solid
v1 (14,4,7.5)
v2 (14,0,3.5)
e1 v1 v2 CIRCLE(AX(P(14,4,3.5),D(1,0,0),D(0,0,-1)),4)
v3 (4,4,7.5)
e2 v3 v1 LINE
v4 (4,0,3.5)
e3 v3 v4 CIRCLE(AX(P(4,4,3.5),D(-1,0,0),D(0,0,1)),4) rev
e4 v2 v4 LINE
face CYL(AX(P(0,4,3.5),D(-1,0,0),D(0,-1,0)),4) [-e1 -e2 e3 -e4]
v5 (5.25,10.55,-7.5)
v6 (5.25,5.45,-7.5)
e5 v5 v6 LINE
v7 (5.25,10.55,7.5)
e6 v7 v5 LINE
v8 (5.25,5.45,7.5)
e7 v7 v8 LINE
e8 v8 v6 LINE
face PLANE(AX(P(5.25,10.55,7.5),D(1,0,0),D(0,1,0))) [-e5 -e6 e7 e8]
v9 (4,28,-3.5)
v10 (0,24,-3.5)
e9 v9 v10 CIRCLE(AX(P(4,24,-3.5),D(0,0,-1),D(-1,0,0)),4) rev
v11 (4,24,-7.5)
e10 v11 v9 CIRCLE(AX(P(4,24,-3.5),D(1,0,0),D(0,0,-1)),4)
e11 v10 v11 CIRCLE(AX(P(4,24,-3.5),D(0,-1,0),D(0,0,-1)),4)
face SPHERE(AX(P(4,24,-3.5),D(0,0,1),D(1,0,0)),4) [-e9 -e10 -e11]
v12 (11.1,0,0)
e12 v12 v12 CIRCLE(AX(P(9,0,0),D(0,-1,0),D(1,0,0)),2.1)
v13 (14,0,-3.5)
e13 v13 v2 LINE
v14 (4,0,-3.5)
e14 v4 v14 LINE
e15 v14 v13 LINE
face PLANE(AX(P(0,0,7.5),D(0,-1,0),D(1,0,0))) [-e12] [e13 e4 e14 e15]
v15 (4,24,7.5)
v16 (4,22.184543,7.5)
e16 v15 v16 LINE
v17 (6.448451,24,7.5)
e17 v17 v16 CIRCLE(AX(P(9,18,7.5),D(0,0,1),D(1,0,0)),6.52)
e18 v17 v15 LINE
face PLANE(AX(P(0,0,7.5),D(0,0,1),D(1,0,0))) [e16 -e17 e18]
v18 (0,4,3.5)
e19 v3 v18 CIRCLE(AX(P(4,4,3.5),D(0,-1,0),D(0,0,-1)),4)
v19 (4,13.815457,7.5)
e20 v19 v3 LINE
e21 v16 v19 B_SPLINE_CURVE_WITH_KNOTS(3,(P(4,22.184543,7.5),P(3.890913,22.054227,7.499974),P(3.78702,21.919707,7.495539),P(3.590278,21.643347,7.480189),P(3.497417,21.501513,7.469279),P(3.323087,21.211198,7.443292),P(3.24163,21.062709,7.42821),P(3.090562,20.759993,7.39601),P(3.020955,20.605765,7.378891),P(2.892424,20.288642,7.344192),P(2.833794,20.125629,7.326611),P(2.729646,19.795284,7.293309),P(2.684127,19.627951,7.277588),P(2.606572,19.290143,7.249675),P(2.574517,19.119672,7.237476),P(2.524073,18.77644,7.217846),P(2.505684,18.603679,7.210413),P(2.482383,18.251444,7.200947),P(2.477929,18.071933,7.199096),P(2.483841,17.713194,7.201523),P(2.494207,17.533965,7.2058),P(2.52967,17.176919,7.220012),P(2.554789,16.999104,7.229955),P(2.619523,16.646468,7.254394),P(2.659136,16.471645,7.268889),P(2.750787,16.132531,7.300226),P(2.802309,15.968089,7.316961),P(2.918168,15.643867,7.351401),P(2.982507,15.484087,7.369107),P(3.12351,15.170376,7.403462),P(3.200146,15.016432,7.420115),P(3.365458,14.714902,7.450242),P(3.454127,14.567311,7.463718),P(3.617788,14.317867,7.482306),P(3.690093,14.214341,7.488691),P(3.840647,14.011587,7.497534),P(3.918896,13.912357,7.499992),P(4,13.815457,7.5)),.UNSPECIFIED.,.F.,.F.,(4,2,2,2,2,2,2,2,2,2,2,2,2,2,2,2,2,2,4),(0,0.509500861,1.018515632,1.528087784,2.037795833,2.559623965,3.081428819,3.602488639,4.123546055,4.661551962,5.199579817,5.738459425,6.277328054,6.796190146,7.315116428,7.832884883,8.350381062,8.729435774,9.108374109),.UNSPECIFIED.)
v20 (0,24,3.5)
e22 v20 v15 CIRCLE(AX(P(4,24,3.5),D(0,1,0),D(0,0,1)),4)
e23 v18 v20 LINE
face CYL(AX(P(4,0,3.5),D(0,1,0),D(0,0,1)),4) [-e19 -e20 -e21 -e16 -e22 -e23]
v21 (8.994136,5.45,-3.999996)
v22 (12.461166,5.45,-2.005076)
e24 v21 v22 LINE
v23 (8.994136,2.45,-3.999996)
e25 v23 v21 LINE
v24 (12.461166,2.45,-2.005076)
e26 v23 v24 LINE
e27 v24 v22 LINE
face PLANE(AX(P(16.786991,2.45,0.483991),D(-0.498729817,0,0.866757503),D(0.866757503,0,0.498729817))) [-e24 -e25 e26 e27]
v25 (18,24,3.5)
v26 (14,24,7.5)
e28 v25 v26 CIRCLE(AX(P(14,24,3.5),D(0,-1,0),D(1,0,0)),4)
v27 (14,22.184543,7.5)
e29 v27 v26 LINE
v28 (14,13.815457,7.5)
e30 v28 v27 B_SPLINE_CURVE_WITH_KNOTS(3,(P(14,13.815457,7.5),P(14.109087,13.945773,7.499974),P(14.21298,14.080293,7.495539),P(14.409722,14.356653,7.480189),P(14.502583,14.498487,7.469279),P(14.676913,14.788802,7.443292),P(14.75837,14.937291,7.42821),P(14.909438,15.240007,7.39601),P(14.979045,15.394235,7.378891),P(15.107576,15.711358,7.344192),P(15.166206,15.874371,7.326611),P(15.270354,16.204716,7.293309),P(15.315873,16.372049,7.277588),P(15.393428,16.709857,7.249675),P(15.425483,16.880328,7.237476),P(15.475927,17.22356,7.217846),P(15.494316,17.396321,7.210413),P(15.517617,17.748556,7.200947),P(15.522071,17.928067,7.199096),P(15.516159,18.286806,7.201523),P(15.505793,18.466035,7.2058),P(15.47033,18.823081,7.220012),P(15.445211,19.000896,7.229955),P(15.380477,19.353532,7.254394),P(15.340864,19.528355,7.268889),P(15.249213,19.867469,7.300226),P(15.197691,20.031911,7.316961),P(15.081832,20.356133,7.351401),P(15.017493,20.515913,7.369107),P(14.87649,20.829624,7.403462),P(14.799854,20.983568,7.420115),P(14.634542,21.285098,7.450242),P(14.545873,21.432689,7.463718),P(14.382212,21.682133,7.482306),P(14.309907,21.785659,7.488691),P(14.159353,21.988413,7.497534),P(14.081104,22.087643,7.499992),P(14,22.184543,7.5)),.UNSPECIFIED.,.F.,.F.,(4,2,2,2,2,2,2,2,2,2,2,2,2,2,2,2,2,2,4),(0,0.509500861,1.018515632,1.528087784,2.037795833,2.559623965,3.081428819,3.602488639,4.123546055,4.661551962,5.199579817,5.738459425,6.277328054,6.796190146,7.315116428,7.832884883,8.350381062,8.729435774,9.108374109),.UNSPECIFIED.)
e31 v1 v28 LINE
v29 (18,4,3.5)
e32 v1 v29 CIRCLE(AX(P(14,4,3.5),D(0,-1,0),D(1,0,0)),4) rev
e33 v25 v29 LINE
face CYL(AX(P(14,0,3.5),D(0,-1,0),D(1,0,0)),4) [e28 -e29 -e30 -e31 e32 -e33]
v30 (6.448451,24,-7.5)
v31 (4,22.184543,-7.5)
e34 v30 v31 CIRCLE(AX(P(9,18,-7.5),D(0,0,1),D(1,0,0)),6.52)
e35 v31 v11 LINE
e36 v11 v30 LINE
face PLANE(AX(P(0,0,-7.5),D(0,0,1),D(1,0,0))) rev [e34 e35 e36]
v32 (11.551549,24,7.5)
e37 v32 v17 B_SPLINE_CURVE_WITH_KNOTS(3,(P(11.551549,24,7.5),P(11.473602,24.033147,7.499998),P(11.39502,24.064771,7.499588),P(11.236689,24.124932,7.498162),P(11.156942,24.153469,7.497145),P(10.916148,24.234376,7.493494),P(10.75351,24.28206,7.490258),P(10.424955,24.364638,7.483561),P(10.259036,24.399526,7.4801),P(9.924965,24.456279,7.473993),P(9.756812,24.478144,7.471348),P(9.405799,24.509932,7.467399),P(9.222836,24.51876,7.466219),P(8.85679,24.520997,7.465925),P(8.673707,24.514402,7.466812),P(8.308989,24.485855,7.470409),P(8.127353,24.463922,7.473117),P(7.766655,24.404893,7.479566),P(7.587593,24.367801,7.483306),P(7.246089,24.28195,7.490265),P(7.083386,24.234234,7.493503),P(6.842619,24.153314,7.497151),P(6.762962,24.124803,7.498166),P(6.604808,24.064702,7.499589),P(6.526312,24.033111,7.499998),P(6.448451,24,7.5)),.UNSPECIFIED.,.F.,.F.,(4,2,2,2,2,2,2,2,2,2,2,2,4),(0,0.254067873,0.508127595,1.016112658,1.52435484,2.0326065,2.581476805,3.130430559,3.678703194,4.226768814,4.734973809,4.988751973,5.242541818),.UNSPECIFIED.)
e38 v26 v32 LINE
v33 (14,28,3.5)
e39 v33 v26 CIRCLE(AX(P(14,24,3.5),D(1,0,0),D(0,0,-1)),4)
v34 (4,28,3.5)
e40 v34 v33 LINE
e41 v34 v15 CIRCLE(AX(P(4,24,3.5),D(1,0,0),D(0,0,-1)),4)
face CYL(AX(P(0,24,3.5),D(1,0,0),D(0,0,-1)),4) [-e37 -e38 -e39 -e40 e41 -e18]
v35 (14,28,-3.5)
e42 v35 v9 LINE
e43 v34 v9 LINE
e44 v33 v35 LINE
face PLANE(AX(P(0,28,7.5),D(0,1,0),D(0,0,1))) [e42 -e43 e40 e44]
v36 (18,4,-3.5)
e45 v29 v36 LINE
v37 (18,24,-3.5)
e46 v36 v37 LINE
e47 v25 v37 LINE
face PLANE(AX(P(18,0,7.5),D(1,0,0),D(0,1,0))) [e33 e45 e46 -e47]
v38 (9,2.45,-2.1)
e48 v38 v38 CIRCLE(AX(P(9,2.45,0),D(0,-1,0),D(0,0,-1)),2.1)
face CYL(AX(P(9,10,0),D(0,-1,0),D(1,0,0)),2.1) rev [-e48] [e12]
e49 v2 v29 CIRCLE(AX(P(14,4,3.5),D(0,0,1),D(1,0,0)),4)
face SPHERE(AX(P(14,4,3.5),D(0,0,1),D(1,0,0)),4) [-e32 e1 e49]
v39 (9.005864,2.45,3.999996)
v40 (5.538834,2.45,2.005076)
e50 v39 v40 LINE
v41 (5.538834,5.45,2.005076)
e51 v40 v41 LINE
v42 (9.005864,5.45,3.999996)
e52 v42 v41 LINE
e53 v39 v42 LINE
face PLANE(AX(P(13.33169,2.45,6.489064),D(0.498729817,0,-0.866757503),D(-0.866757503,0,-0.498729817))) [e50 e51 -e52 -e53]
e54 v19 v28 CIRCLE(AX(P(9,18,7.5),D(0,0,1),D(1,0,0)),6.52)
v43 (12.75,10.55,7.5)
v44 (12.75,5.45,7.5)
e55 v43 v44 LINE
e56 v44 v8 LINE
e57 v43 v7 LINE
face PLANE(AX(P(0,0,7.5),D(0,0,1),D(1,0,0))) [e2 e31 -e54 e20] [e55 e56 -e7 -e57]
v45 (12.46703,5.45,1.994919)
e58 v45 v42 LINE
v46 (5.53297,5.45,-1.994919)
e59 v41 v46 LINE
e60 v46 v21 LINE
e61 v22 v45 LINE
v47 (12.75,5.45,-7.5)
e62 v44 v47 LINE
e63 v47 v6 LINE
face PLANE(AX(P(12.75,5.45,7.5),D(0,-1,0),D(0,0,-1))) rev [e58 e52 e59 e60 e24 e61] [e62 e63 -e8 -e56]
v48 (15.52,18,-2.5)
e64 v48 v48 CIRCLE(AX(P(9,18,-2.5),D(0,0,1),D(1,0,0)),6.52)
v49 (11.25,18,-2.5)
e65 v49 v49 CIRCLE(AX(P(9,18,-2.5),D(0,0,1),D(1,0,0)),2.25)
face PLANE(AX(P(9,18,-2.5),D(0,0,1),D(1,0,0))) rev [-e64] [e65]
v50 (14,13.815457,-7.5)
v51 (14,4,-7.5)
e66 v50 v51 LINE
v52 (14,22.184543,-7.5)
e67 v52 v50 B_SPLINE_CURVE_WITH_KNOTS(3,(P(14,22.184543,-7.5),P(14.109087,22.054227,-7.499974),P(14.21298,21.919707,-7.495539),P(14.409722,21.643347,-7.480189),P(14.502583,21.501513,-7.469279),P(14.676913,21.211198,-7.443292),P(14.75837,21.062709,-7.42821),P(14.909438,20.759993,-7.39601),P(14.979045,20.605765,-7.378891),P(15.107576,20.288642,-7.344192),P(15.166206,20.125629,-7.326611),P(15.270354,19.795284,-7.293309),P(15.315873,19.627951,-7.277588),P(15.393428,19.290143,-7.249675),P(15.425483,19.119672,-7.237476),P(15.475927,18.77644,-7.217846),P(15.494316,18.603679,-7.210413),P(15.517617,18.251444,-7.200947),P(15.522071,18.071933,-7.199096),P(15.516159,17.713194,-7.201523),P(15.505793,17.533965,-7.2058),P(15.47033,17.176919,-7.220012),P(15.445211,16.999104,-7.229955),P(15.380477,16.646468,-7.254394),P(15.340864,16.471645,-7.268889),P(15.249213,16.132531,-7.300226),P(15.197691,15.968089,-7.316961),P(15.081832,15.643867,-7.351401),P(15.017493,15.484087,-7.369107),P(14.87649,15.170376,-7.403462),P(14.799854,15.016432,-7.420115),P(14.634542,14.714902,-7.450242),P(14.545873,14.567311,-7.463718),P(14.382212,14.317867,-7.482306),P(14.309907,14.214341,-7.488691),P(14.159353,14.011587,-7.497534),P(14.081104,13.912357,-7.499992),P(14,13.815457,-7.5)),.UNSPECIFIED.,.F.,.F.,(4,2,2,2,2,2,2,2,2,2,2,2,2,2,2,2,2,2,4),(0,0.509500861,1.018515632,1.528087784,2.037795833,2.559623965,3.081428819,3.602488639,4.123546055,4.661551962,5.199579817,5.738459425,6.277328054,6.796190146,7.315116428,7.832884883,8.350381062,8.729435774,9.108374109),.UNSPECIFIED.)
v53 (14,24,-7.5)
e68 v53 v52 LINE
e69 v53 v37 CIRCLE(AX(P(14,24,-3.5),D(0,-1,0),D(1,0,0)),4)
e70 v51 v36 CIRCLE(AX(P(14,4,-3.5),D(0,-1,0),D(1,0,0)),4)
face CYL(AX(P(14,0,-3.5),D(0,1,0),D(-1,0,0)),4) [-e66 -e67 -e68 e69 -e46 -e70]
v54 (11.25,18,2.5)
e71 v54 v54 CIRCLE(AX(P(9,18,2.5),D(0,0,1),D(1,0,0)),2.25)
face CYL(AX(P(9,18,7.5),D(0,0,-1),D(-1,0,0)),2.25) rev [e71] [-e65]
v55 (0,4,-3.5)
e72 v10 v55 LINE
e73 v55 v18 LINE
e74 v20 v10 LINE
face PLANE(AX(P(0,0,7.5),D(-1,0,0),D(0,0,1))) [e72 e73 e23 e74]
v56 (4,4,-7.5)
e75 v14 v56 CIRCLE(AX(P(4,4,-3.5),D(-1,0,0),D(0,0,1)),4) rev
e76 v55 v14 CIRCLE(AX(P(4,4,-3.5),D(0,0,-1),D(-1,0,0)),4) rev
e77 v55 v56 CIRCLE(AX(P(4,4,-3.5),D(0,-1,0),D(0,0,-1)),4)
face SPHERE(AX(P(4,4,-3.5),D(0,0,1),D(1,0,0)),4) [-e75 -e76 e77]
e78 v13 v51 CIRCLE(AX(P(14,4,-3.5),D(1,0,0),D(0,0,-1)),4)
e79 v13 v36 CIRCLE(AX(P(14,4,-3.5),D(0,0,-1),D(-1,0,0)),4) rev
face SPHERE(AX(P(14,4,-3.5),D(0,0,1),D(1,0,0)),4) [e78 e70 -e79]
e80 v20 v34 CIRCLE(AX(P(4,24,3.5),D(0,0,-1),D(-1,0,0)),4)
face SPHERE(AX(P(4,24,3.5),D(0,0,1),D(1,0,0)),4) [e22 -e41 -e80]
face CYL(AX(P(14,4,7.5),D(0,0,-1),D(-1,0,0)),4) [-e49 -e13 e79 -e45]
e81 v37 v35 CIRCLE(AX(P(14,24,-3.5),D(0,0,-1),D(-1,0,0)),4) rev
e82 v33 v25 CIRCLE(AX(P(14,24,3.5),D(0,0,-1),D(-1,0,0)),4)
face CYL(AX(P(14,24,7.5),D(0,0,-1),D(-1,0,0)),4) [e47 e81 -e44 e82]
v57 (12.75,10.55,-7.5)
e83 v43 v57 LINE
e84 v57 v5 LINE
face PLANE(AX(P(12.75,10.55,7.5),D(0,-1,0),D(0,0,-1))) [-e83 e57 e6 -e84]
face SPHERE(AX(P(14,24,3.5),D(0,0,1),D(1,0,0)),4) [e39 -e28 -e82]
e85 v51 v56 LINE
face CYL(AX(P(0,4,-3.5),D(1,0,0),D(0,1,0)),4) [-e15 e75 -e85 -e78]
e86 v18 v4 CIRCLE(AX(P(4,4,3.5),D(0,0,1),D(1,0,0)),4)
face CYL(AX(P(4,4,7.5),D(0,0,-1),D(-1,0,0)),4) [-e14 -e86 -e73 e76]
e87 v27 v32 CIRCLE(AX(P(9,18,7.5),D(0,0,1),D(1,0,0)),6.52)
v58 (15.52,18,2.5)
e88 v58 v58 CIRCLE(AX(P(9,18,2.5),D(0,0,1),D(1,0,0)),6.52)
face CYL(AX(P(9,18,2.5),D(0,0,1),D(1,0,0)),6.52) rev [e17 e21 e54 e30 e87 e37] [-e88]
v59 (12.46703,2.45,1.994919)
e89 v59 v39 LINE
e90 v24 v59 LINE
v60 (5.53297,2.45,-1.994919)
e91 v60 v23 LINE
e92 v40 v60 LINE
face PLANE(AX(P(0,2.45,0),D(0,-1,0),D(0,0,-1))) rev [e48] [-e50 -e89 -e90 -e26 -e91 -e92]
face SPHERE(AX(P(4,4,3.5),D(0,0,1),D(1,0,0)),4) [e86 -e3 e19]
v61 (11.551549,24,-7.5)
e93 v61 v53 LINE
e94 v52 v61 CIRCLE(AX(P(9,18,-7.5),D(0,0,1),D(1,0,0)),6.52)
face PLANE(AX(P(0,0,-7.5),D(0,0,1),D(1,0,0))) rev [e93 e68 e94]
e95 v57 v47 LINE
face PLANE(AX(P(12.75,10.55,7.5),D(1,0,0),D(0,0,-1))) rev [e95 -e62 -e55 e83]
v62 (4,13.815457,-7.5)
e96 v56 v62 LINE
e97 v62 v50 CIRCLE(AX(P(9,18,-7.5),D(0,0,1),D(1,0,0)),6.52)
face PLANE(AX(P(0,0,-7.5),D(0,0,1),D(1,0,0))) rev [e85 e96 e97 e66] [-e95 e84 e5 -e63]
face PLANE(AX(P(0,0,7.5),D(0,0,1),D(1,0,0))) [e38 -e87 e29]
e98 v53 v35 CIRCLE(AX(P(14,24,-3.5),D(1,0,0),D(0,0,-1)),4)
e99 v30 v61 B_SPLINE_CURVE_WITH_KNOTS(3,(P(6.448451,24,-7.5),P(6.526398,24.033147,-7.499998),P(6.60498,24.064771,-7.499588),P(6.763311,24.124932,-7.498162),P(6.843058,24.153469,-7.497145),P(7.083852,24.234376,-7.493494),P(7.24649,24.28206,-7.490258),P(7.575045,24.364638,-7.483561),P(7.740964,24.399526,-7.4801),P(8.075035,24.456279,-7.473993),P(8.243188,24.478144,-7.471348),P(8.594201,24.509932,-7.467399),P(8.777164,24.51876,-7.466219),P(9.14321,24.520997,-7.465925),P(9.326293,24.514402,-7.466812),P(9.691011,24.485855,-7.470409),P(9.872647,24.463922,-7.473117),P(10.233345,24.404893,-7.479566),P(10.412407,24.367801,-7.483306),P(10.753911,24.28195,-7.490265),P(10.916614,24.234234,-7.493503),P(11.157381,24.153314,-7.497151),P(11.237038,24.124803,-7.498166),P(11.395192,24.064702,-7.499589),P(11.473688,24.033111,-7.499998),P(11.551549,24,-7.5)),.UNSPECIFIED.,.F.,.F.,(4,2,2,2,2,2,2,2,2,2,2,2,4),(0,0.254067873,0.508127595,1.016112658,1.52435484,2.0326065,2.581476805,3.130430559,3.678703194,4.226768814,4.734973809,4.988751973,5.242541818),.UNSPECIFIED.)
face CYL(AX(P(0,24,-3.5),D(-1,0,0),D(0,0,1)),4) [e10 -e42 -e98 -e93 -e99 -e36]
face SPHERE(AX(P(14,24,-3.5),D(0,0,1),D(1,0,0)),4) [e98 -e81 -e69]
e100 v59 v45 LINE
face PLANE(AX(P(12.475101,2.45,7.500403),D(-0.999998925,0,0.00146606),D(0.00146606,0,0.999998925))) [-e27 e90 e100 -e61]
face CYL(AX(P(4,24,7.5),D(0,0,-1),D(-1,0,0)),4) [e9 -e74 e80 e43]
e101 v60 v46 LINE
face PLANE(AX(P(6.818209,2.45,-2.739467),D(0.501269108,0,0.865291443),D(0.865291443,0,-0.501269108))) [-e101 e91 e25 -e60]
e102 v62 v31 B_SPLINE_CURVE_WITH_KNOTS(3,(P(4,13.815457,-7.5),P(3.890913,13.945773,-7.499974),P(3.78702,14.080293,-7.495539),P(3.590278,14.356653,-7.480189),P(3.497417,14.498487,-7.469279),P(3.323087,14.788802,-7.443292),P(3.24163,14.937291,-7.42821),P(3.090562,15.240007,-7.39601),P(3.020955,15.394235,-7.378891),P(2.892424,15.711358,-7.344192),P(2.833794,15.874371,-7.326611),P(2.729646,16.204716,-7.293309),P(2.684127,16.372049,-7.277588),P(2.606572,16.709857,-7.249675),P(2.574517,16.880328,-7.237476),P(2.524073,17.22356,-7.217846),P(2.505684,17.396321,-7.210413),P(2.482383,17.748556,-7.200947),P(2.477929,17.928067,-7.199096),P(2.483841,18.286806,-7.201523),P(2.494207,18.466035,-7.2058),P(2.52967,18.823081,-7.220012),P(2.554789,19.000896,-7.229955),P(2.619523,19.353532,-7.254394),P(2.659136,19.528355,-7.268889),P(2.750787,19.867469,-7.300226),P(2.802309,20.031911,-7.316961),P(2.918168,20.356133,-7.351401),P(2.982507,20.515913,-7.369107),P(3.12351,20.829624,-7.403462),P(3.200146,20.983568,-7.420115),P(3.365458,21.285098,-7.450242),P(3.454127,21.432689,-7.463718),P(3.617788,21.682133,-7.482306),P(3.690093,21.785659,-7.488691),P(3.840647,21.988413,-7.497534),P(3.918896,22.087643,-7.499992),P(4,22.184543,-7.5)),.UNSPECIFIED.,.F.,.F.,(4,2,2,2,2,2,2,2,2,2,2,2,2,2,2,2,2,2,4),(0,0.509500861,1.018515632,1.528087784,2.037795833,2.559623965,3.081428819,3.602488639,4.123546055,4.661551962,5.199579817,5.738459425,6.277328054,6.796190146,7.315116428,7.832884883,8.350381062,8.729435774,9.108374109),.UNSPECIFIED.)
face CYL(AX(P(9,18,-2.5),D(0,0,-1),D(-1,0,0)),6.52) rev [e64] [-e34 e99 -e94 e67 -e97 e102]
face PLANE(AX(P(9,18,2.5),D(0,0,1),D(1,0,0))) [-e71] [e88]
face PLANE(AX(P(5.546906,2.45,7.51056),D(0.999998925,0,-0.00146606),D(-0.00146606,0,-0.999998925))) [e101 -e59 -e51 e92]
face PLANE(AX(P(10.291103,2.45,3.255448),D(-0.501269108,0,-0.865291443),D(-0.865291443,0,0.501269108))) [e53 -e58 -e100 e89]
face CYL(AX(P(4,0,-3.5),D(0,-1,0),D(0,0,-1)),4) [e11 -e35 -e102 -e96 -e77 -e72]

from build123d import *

# Parameters (mm, degrees)
SKETCH1_R           = 2.25
BOSS_EXTRUDE1_DEPTH = 7.5
CUT_EXTRUDE1_START  = -7.5
SKETCH1_3_R         = 6.52
SKETCH1_3_R_2       = 2.25
CUT_EXTRUDE1_DEPTH  = 5
CUT_EXTRUDE2_START  = 2.5
SKETCH1_4_R         = 6.52
SKETCH1_4_R_2       = 2.25
CUT_EXTRUDE2_DEPTH  = 5
FILLET1_R           = 4
SKETCH2_R           = 2.1
CUT_EXTRUDE3_DEPTH  = 10
SKETCH3_W           = 7.5
SKETCH3_H           = 5.1
CUT_EXTRUDE4_DEPTH  = 37.510272694
CUT_EXTRUDE5_START  = -2.45
SKETCH2_7_R         = 2.1
CUT_EXTRUDE5_DEPTH  = 3


with BuildPart() as part:
    # Sketch1 → Boss-Extrude1 (new, symmetric)
    with BuildSketch(Plane.XY):
        with BuildLine():
            Line((0, 0), (0, 24))
            ThreePointArc((0, 24), (1.171572875, 26.828427125), (4, 28))
            Line((4, 28), (14, 28))
            ThreePointArc((14, 28), (16.828427125, 26.828427125), (18, 24))
            Line((18, 24), (18, 0))
            Line((18, 0), (0, 0))
        make_face()
        with Locations((9, 18)):
            Circle(SKETCH1_R, mode=Mode.SUBTRACT)
    extrude(amount=BOSS_EXTRUDE1_DEPTH, both=True)

    # Sketch1<3> → Cut-Extrude1 (cut)
    with BuildSketch(Plane.XY.offset(CUT_EXTRUDE1_START)):
        with Locations((9, 18)):
            Circle(SKETCH1_3_R)
        with Locations((9, 18)):
            Circle(SKETCH1_3_R_2, mode=Mode.SUBTRACT)
    extrude(amount=CUT_EXTRUDE1_DEPTH, mode=Mode.SUBTRACT)

    # Sketch1<4> → Cut-Extrude2 (cut)
    with BuildSketch(Plane.XY.offset(CUT_EXTRUDE2_START)):
        with Locations((9, 18)):
            Circle(SKETCH1_4_R)
        with Locations((9, 18)):
            Circle(SKETCH1_4_R_2, mode=Mode.SUBTRACT)
    extrude(amount=CUT_EXTRUDE2_DEPTH, mode=Mode.SUBTRACT)

    # Fillet1
    # the kernel refuses this fillet: 4 mm, written as the material it takes off along each edge
    with BuildSketch(Plane(origin=(4, 4, -3.5), x_dir=(0, -1, 0), z_dir=(-1, 0, 0))) as fillet1_piece_1_section:
        Polygon((0, 0), (FILLET1_R, 0), (FILLET1_R, -FILLET1_R), (0, -FILLET1_R), align=None)
    fillet1_piece_1 = extrude(amount=FILLET1_R, mode=Mode.PRIVATE)
    fillet1_piece_1 = fillet1_piece_1 - Plane(origin=(4, 4, -3.5), x_dir=(0, 0.7071067811865475, 0.7071067811865475), z_dir=(-1, 0, 0)) * Sphere(FILLET1_R, mode=Mode.PRIVATE)
    add(fillet1_piece_1, mode=Mode.SUBTRACT)
    with BuildSketch(Plane(origin=(4, 4, 3.5), x_dir=(0, -1, 0), z_dir=(-1, 0, 0))) as fillet1_piece_2_section:
        Polygon((0, 0), (FILLET1_R, 0), (FILLET1_R, FILLET1_R), (0, FILLET1_R), align=None)
    fillet1_piece_2 = extrude(amount=FILLET1_R, mode=Mode.PRIVATE)
    fillet1_piece_2 = fillet1_piece_2 - Plane(origin=(4, 4, 3.5), x_dir=(0, 0.7071067811865475, -0.7071067811865475), z_dir=(-1, 0, 0)) * Sphere(FILLET1_R, mode=Mode.PRIVATE)
    add(fillet1_piece_2, mode=Mode.SUBTRACT)
    with BuildSketch(Plane(origin=(14, 4, -3.5), x_dir=(0, 0, -1), z_dir=(0, -1, 0))) as fillet1_piece_3_section:
        Polygon((0, 0), (FILLET1_R, 0), (FILLET1_R, FILLET1_R), (0, FILLET1_R), align=None)
    fillet1_piece_3 = extrude(amount=FILLET1_R, mode=Mode.PRIVATE)
    fillet1_piece_3 = fillet1_piece_3 - Plane(origin=(14, 4, -3.5), x_dir=(-0.7071067811865475, 0, 0.7071067811865475), z_dir=(0, -1, 0)) * Sphere(FILLET1_R, mode=Mode.PRIVATE)
    add(fillet1_piece_3, mode=Mode.SUBTRACT)
    with BuildSketch(Plane(origin=(14, 4, 3.5), x_dir=(0, 0, 1), z_dir=(0, -1, 0))) as fillet1_piece_4_section:
        Polygon((0, 0), (FILLET1_R, 0), (FILLET1_R, -FILLET1_R), (0, -FILLET1_R), align=None)
    fillet1_piece_4 = extrude(amount=FILLET1_R, mode=Mode.PRIVATE)
    fillet1_piece_4 = fillet1_piece_4 - Plane(origin=(14, 4, 3.5), x_dir=(-0.7071067811865475, 0, -0.7071067811865475), z_dir=(0, -1, 0)) * Sphere(FILLET1_R, mode=Mode.PRIVATE)
    add(fillet1_piece_4, mode=Mode.SUBTRACT)
    with BuildSketch(Plane(origin=(0, 4, -7.5), x_dir=(0, 0, 1), z_dir=(0, 1, 0)), Plane(origin=(18, 24, 7.5), x_dir=(-1, 0, 0), z_dir=(0, -1, 0))) as fillet1_piece_5:
        with BuildLine():
            CenterArc((FILLET1_R, FILLET1_R), FILLET1_R, 180, 90)
            Line((0, FILLET1_R), (0, 0))
            Line((0, 0), (FILLET1_R, 0))
        make_face()
    extrude(amount=20, mode=Mode.SUBTRACT)
    with BuildSketch(Plane(origin=(4, 24, -7.5), x_dir=(-1, 0, 0), z_dir=(0, -1, 0))) as fillet1_piece_6:
        with BuildLine():
            CenterArc((4 - FILLET1_R, -FILLET1_R), FILLET1_R, 0, 90)
            Line((4, -FILLET1_R), (4, 0))
            Line((4, 0), (4 - FILLET1_R, 0))
        make_face()
    revolve(axis=Axis((4, 24, -7.5), (0, 0, -1)), revolution_arc=90, mode=Mode.SUBTRACT)
    with BuildSketch(Plane(origin=(0, 4, 7.5), x_dir=(0, 0, -1), z_dir=(0, 1, 0)), Plane(origin=(18, 24, -7.5), x_dir=(-1, 0, 0), z_dir=(0, -1, 0))) as fillet1_piece_7:
        with BuildLine():
            CenterArc((FILLET1_R, -FILLET1_R), FILLET1_R, 90, 90)
            Line((0, -FILLET1_R), (0, 0))
            Line((0, 0), (FILLET1_R, 0))
        make_face()
    extrude(amount=20, mode=Mode.SUBTRACT)
    with BuildSketch(Plane(origin=(18, 0, -3.5), x_dir=(-1, 0, 0), z_dir=(0, 0, 1)), Plane(origin=(0, 0, -3.5), x_dir=(0, 1, 0), z_dir=(0, 0, 1))) as fillet1_piece_8:
        with BuildLine():
            CenterArc((FILLET1_R, -FILLET1_R), FILLET1_R, 90, 90)
            Line((0, -FILLET1_R), (0, 0))
            Line((0, 0), (FILLET1_R, 0))
        make_face()
    extrude(amount=7, mode=Mode.SUBTRACT)
    with BuildSketch(Plane(origin=(14, 0, 7.5), x_dir=(0, 0, -1), z_dir=(-1, 0, 0)), Plane(origin=(4, 28, -7.5), x_dir=(0, -1, 0), z_dir=(1, 0, 0))) as fillet1_piece_9:
        with BuildLine():
            CenterArc((FILLET1_R, -FILLET1_R), FILLET1_R, 90, 90)
            Line((0, -FILLET1_R), (0, 0))
            Line((0, 0), (FILLET1_R, 0))
        make_face()
    extrude(amount=10, mode=Mode.SUBTRACT)
    with BuildSketch(Plane(origin=(14, 24, 7.5), x_dir=(0, 1, 0), z_dir=(-1, 0, 0))) as fillet1_piece_10:
        with BuildLine():
            CenterArc((4 - FILLET1_R, FILLET1_R), FILLET1_R, 270, 90)
            Line((4, FILLET1_R), (4, 0))
            Line((4, 0), (4 - FILLET1_R, 0))
        make_face()
    revolve(axis=Axis((14, 24, 7.5), (0, 0, -1)), revolution_arc=90, mode=Mode.SUBTRACT)
    with BuildSketch(Plane(origin=(4, 28, 7.5), x_dir=(0, -1, 0), z_dir=(1, 0, 0)), Plane(origin=(14, 0, -7.5), x_dir=(0, 0, 1), z_dir=(-1, 0, 0))) as fillet1_piece_11:
        with BuildLine():
            CenterArc((FILLET1_R, FILLET1_R), FILLET1_R, 180, 90)
            Line((0, FILLET1_R), (0, 0))
            Line((0, 0), (FILLET1_R, 0))
        make_face()
    extrude(amount=10, mode=Mode.SUBTRACT)
    with BuildSketch(Plane(origin=(14, 24, -7.5), x_dir=(0, 1, 0), z_dir=(-1, 0, 0))) as fillet1_piece_12:
        with BuildLine():
            CenterArc((4 - FILLET1_R, -FILLET1_R), FILLET1_R, 0, 90)
            Line((4, -FILLET1_R), (4, 0))
            Line((4, 0), (4 - FILLET1_R, 0))
        make_face()
    revolve(axis=Axis((14, 24, -7.5), (0, 0, -1)), revolution_arc=90, mode=Mode.SUBTRACT)
    with BuildSketch(Plane(origin=(4, 24, 7.5), x_dir=(-1, 0, 0), z_dir=(0, -1, 0))) as fillet1_piece_13:
        with BuildLine():
            CenterArc((4 - FILLET1_R, FILLET1_R), FILLET1_R, 270, 90)
            Line((4 - FILLET1_R, 0), (4, 0))
            Line((4, 0), (4, FILLET1_R))
        make_face()
    revolve(axis=Axis((4, 24, 7.5), (0, 0, -1)), revolution_arc=90, mode=Mode.SUBTRACT)

    # Sketch2 → Cut-Extrude3 (cut)
    with BuildSketch(Plane.XZ):
        with Locations((9, 0)):
            Circle(SKETCH2_R)
    extrude(amount=-CUT_EXTRUDE3_DEPTH, mode=Mode.SUBTRACT)

    # Sketch3 → Cut-Extrude4 (cut, through all)
    with BuildSketch(Plane(origin=(0, 0, -7.5), x_dir=(-1, 0, 0), z_dir=(0, 0, -1))):
        with Locations((-9, 8)):
            Rectangle(SKETCH3_W, SKETCH3_H)
    extrude(amount=-CUT_EXTRUDE4_DEPTH, mode=Mode.SUBTRACT)

    # Sketch2<7> → Cut-Extrude5 (cut)
    with BuildSketch(Plane.XZ.offset(CUT_EXTRUDE5_START)):
        Polygon((12.461165772, -2.005076432), (12.467030013, 1.994919269), (9.005864241, 3.999995701), (5.538834228, 2.005076432), (5.532969987, -1.994919269), (8.994135759, -3.999995701), align=None)
        with Locations((9, 0)):
            Circle(SKETCH2_7_R, mode=Mode.SUBTRACT)
    extrude(amount=-CUT_EXTRUDE5_DEPTH, mode=Mode.SUBTRACT)


solid = part.part
